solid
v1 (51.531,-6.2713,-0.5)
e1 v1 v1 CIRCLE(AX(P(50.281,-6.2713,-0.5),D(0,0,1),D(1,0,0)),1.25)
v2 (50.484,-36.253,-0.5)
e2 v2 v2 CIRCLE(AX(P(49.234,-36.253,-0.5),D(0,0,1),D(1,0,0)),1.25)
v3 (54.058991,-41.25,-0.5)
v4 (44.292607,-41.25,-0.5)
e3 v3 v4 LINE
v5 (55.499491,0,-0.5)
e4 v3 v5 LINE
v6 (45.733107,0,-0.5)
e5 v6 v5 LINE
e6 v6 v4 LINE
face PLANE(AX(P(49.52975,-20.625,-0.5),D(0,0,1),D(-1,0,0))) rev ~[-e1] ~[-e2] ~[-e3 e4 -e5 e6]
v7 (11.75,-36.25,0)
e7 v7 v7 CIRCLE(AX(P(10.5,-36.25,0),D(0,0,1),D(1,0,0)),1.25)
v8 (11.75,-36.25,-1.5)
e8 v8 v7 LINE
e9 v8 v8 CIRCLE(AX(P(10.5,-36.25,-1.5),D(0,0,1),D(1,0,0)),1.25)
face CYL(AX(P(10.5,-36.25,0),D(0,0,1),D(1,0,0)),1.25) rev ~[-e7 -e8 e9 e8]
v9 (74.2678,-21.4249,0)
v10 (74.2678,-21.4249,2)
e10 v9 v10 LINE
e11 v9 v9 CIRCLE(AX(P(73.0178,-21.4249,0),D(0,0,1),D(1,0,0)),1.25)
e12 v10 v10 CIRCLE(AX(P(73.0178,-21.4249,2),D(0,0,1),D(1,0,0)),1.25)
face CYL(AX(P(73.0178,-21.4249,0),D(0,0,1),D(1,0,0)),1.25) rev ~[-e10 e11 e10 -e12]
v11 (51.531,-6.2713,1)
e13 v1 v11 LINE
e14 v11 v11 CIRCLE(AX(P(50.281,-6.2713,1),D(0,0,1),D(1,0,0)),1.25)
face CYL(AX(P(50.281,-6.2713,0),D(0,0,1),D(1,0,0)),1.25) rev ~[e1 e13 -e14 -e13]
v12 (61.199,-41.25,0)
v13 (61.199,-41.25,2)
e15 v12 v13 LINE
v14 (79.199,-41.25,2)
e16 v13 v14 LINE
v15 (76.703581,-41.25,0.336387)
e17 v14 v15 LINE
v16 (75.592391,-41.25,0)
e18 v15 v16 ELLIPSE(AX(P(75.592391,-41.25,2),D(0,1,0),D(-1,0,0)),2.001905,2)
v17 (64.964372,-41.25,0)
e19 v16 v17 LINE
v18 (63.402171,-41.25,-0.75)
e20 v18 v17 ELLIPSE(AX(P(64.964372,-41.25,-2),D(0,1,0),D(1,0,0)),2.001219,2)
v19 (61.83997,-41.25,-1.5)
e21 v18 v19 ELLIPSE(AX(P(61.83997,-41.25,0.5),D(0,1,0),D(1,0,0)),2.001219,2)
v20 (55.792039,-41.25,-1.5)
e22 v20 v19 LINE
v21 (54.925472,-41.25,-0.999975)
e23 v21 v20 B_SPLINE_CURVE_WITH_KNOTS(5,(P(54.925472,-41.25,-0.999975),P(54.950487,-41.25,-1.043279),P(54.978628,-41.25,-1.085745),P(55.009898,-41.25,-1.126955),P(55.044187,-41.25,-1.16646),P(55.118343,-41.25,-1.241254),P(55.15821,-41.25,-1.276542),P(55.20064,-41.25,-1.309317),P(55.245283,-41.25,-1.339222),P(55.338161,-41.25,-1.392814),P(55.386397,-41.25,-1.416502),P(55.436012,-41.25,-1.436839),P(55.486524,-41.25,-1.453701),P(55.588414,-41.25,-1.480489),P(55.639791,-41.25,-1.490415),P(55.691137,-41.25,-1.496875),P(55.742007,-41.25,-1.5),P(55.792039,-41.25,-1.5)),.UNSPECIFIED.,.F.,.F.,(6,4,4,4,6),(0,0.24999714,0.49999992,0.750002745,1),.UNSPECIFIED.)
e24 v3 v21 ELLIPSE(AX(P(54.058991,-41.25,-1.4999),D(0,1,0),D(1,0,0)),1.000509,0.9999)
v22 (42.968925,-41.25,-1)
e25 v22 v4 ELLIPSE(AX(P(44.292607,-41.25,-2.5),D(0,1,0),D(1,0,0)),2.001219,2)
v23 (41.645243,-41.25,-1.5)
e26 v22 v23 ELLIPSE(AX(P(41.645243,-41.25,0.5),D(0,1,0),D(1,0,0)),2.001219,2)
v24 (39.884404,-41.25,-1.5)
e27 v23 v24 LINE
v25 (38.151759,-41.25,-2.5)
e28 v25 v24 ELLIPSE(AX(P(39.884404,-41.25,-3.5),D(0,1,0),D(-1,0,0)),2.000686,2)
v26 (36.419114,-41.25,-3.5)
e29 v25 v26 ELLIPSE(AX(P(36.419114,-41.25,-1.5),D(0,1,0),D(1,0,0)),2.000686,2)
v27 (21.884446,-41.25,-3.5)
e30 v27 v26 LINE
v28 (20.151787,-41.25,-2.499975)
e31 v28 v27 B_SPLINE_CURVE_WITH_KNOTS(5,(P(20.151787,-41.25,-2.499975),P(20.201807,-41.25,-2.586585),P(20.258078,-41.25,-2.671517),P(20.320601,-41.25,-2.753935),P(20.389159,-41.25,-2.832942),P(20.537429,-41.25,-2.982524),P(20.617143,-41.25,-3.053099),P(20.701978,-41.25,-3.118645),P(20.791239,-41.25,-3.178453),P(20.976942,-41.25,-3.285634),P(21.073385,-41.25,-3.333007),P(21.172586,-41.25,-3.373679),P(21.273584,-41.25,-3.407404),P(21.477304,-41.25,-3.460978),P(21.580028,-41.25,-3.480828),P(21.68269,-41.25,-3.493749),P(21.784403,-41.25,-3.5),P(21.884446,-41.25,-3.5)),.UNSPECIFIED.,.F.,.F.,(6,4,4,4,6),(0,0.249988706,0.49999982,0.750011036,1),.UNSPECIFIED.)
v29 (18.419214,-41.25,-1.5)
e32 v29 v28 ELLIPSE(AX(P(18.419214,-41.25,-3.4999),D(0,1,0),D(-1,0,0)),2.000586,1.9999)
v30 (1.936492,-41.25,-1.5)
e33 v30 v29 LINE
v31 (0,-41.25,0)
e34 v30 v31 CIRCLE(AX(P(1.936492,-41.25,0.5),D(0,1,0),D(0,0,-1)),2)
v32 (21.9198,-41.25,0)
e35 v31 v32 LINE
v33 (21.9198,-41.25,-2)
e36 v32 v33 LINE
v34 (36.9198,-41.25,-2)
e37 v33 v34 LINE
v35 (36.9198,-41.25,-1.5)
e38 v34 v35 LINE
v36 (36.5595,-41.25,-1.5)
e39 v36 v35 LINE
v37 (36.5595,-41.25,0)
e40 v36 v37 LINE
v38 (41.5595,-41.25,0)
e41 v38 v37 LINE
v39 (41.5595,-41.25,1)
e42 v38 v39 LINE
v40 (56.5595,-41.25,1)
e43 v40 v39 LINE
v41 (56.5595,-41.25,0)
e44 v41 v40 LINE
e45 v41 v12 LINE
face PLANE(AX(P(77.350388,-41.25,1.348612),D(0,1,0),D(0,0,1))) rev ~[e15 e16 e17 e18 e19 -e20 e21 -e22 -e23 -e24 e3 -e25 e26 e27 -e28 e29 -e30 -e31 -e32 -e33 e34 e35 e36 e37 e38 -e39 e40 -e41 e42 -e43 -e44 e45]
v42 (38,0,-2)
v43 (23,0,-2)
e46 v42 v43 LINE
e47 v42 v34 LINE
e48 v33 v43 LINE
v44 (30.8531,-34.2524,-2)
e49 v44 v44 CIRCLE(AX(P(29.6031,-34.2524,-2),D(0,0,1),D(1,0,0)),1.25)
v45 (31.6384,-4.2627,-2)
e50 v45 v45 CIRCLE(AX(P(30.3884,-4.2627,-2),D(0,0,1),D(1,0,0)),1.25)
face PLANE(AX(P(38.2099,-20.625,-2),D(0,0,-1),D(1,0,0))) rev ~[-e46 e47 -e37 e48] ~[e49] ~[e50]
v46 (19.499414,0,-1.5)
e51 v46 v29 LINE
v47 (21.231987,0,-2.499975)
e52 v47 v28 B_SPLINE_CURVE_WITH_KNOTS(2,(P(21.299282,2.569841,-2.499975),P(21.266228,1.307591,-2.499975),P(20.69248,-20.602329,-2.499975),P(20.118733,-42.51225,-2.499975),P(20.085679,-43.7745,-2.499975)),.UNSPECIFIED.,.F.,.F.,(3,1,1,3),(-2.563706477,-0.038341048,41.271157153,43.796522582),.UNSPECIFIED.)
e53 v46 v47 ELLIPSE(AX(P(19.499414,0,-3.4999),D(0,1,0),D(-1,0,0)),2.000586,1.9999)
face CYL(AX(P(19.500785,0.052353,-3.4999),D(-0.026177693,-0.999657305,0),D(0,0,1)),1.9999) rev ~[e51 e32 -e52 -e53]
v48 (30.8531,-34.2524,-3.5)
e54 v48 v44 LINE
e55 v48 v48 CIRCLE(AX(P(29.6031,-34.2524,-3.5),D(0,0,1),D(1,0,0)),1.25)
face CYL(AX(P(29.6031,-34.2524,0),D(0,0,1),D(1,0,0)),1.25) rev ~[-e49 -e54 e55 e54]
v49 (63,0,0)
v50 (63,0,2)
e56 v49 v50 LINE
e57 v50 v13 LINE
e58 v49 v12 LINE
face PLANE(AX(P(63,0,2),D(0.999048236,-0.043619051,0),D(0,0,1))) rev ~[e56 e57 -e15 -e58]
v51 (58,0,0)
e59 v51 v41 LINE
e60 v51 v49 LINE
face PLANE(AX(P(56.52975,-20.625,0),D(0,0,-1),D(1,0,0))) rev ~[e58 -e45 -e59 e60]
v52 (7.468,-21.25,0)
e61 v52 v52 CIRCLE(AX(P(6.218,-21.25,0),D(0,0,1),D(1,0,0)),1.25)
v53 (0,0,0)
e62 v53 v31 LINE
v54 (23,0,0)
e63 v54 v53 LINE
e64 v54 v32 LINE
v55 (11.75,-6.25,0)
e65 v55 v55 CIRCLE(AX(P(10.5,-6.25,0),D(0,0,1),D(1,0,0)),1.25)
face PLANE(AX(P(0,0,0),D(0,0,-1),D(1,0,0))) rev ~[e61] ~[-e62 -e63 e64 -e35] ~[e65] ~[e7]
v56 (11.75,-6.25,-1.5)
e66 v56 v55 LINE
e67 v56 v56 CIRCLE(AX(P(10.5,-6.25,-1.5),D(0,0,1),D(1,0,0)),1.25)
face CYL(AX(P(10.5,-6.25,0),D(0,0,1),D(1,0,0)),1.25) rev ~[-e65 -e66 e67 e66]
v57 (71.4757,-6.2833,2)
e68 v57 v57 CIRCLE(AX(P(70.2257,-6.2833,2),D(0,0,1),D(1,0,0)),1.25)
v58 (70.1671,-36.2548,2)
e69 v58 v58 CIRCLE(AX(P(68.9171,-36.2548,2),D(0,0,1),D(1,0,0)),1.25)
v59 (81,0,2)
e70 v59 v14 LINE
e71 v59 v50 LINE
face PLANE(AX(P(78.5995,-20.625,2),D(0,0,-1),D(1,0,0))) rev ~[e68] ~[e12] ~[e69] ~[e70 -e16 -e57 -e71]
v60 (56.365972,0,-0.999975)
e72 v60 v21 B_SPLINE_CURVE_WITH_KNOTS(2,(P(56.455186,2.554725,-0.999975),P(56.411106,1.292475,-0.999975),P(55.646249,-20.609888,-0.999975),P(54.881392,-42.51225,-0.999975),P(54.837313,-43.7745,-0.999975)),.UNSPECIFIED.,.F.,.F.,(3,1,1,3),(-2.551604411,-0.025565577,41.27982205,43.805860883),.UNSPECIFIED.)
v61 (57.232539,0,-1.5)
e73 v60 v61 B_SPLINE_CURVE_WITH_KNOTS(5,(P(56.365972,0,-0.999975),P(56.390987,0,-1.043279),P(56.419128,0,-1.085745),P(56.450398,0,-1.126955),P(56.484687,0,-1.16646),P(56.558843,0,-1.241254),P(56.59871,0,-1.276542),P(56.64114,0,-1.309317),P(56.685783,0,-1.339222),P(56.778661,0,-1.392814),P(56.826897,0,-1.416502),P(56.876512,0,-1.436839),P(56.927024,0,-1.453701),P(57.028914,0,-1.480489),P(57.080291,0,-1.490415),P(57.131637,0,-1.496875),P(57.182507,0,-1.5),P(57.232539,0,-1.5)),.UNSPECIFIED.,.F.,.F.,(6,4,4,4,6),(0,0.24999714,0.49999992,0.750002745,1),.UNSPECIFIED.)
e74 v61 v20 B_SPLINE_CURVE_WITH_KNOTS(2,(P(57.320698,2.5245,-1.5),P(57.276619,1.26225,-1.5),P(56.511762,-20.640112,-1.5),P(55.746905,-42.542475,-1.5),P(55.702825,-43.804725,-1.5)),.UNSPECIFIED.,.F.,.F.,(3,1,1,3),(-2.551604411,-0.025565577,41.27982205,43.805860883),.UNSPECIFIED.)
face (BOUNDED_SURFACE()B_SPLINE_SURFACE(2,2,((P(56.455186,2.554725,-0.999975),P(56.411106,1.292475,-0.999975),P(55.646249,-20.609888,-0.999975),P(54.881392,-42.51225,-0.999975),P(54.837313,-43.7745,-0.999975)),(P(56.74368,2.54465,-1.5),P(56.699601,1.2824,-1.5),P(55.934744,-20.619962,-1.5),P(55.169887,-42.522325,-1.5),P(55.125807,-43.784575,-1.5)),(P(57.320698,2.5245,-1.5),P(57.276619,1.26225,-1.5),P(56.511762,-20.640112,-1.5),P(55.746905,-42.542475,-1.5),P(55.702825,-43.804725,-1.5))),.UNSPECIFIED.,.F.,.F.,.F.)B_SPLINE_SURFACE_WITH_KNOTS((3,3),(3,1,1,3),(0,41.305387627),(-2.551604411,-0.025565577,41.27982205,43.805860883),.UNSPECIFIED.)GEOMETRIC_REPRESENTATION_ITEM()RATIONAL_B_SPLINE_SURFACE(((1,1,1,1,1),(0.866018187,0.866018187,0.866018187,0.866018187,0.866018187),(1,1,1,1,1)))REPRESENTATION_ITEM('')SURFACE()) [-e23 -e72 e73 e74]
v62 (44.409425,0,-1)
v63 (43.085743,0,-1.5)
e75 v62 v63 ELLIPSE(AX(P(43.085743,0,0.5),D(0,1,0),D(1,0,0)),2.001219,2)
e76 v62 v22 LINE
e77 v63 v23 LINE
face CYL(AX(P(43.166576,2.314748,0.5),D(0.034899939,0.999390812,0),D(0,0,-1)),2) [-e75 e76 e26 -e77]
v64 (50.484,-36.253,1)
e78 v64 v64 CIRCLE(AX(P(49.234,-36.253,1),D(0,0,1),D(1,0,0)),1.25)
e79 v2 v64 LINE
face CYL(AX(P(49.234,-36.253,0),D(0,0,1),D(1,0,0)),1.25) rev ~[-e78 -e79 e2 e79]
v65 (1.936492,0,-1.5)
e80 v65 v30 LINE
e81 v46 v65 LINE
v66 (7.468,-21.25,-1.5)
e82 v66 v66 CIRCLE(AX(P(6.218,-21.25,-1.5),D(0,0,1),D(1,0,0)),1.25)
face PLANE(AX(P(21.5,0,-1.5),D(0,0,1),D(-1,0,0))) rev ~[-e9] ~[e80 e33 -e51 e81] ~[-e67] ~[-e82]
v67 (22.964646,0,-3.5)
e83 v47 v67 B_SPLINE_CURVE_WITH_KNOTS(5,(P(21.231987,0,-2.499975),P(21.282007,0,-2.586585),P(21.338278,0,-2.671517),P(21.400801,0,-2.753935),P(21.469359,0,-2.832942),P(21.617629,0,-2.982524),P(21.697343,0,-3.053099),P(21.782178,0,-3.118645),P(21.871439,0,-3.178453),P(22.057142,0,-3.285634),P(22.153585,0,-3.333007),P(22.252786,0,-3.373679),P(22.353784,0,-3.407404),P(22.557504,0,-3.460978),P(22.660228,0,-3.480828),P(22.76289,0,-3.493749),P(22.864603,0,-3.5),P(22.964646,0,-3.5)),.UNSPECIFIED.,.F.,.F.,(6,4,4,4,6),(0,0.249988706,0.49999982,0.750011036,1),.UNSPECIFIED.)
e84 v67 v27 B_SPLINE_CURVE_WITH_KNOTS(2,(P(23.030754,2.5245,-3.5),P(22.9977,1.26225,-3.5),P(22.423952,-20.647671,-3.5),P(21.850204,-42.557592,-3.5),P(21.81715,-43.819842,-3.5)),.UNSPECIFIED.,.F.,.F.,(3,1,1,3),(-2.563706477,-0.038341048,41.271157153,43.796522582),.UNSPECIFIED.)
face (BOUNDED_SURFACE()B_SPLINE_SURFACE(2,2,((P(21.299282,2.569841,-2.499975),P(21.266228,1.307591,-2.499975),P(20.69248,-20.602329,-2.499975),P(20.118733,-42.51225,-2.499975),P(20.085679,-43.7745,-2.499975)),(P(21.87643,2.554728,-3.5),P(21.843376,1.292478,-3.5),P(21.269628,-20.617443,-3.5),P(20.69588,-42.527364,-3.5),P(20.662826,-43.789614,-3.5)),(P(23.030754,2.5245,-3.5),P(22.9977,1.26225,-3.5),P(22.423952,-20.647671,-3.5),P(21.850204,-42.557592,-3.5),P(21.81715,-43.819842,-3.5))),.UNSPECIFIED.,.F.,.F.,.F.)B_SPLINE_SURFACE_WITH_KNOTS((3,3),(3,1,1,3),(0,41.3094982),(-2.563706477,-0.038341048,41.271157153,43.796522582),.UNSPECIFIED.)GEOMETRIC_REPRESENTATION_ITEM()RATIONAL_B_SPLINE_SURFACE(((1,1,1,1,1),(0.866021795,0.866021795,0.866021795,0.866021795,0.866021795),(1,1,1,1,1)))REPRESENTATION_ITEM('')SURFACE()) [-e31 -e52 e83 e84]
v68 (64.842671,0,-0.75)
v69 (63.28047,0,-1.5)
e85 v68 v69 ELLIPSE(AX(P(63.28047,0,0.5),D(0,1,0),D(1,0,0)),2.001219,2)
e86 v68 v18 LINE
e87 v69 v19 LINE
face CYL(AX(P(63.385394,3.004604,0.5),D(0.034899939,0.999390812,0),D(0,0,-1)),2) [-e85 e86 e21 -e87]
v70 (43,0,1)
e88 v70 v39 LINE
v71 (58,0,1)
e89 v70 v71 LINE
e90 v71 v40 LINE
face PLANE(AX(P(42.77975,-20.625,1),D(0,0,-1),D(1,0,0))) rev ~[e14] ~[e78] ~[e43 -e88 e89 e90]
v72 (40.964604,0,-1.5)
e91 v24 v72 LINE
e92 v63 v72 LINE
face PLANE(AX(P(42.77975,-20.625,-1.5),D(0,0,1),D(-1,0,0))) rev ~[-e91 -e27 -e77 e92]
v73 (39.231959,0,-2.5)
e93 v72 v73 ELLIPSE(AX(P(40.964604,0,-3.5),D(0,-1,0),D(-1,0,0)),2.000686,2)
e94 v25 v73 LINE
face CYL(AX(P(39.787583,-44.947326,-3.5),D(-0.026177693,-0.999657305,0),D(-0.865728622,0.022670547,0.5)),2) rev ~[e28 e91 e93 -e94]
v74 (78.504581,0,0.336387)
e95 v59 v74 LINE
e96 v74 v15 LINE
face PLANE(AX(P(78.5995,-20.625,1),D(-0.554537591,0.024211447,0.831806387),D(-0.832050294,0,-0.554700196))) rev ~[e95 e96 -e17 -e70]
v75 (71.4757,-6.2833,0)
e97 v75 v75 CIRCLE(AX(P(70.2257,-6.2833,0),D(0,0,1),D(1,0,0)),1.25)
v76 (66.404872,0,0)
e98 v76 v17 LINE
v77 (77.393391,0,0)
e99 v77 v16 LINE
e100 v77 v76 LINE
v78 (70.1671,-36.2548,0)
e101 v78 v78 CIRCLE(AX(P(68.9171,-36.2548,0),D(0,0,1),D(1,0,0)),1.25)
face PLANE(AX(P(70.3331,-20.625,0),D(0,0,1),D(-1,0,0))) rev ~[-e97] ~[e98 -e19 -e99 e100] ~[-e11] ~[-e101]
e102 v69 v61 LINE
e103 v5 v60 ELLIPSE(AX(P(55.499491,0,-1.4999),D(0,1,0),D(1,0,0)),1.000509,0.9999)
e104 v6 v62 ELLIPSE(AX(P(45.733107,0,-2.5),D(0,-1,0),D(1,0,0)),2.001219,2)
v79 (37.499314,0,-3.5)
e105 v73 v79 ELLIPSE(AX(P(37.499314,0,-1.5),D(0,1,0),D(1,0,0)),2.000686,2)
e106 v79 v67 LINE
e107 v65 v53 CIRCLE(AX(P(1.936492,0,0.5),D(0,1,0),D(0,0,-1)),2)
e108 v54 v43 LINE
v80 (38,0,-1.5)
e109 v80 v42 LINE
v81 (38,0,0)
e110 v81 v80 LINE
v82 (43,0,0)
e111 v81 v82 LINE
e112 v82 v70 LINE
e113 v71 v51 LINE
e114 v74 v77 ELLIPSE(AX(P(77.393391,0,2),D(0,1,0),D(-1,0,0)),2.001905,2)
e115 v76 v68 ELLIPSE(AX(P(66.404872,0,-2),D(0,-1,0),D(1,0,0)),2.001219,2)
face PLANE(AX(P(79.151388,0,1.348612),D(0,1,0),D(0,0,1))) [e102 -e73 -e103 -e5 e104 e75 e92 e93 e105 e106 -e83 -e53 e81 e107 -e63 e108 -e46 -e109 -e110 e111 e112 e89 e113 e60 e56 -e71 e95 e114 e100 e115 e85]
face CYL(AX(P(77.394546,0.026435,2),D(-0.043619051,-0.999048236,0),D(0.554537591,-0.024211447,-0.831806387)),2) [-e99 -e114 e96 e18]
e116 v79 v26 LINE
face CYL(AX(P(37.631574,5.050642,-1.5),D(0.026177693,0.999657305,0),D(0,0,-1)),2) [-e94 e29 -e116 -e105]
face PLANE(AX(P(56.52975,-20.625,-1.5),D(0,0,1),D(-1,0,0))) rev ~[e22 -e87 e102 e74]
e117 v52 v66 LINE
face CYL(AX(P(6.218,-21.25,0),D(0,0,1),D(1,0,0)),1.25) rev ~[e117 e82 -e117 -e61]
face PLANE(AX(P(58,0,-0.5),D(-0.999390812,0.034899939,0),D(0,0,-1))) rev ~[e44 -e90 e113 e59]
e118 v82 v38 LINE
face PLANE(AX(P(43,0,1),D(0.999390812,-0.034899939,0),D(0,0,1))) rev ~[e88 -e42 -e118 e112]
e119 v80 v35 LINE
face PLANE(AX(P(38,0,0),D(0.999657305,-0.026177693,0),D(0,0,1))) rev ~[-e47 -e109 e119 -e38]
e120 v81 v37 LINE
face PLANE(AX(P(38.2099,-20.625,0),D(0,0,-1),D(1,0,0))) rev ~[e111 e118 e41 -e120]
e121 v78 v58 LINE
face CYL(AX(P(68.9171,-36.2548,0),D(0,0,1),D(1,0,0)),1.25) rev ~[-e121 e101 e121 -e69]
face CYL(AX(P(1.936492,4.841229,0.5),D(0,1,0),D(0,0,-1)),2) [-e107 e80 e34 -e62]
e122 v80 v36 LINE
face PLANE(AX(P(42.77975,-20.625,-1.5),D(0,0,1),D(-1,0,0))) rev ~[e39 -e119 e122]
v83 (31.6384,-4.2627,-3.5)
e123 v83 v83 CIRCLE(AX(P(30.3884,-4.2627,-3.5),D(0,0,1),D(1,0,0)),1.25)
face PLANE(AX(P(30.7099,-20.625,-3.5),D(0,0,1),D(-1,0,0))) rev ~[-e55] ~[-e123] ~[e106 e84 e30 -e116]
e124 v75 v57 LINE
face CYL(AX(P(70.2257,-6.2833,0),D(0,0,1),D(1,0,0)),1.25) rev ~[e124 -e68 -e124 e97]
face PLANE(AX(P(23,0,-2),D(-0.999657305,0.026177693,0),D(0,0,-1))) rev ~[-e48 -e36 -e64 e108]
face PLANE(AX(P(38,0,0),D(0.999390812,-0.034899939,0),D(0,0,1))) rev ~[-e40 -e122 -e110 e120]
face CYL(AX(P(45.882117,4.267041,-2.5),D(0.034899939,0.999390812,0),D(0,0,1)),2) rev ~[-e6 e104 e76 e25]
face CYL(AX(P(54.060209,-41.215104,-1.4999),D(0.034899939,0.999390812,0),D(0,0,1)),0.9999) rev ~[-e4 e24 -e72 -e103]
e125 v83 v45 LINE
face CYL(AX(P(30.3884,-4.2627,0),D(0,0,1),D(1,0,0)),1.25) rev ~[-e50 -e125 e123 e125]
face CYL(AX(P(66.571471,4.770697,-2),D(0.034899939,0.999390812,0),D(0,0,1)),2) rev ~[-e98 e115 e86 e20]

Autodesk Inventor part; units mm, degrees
ref_plane "YZ Plane" through (0, 0, 0) normal (1, 0, 0) x (0, 1, 0)
ref_plane "XY Plane" through (0, 0, 0) normal (0, 0, 1) x (1, 0, 0)
sketch "Sketch1" plane through (0, 0, 0) normal (0, 0, 1) x (1, 0, 0)
  line L0 (0, 0) -> (81, 0)
  line L1 (0, 0) -> (0, -41.25)
  line L2 (0, -41.25) -> (76.5595, -41.25)
  line L3 (10.5, 0) -> (10.5, -41.25)
  line L4 (30.5, 0) -> (29.4198, -41.25)
  line L5 (30.5, 0) -> (71.7641, 0) construction
  line L6 (50.5, 0) -> (49.0595, -41.25)
  line L7 (70.5, 0) -> (68.699, -41.25)
  line L8 (78, 0) -> (76.5595, -41.25)
  line L9 (78, 0) -> (119.2751, 0) construction
  line L10 (76.5595, -41.25) -> (81, 0)
  line L11 (3, 0) -> (3, -41.25)
  line L12 (18, 0) -> (18, -41.25)
  line L13 (23, 0) -> (21.9198, -41.25)
  line L14 (23, 0) -> (64.2641, 0) construction
  line L15 (38, 0) -> (36.9198, -41.25)
  line L16 (38, 0) -> (79.2641, 0) construction
  line L17 (43, 0) -> (41.5595, -41.25)
  line L18 (43, 0) -> (84.2751, 0) construction
  line L19 (58, 0) -> (56.5595, -41.25)
  line L20 (58, 0) -> (99.2751, 0) construction
  line L21 (63, 0) -> (61.199, -41.25)
  line L22 (63, 0) -> (104.2893, 0) construction
  line L23 (29.4198, -41.25) -> (29.6031, -34.2524)
  line L24 (29.6031, -34.2524) -> (30.3884, -4.2627)
  line L25 (49.0595, -41.25) -> (49.234, -36.253)
  line L26 (49.234, -36.253) -> (50.281, -6.2713)
  line L27 (68.699, -41.25) -> (68.9171, -36.2548)
  line L28 (68.9171, -36.2548) -> (70.2257, -6.2833)
  circle A0 centre (10.5, -6.25) radius 1.25
  circle A1 centre (10.5, -36.25) radius 1.25
  circle A2 centre (30.3884, -4.2627) radius 1.25
  circle A3 centre (29.6031, -34.2524) radius 1.25
  circle A4 centre (50.281, -6.2713) radius 1.25
  circle A5 centre (49.234, -36.253) radius 1.25
  circle A6 centre (70.2257, -6.2833) radius 1.25
  circle A7 centre (68.9171, -36.2548) radius 1.25
  line L29 (10.5, -6.25) -> (10.5, -21.25)
  line L30 (10.5, -21.25) -> (6.218, -21.25)
  circle A8 centre (6.218, -21.25) radius 1.25
  line L31 (6.218, -21.25) -> (73.0178, -21.4249)
  line L32 (6.218, -21.25) -> (73.018, -21.25) construction
  circle A9 centre (73.0178, -21.4249) radius 1.25
  dimension "d10" = 92
  dimension "d11" = 91.5
  dimension "d12" = 91.5
  dimension "d13" = 92
  dimension "d14" = 92
  dimension "d15" = 92.5
  dimension "d67" = 2.5
  dimension "d68" = 2.5
  dimension "d69" = 2.5
  dimension "d70" = 2.5
  dimension "d71" = 2.5
  dimension "d72" = 2.5
  dimension "d73" = 2.5
  dimension "d74" = 2.5
  dimension "d77" = 15
  dimension "d78" = 4.282
  dimension "d79" = 2.5
  dimension "d80" = 66.8
  dimension "d81" = 0.15
  dimension "d82" = 2.5
sketch "Sketch2" plane through (0, 0, 0) normal (0, 1, 0) x (-1, 0, 0)
  line L0 (-43, 0) -> (-58, 0)
  line L1 (-58, 0) -> (-58, 1)
  line L2 (-58, 1) -> (-43, 1)
  line L3 (-43, 1) -> (-43, 0)
  line L4 (-64.4672, 0) -> (-78, 0)
  line L5 (-78, 0) -> (-78, 2)
  line L6 (-78, 2) -> (-63, 2)
  line L7 (-63, 2) -> (-63, 0)
  line L8 (-23, 0) -> (-21.9198, 0) projected
  line L9 (-30.5, 0) -> (-29.4198, 0) projected
  line L10 (-23, 0) -> (-38, 0)
  line L11 (-38, 0) -> (-38, -2)
  line L12 (-38, -2) -> (-23, -2)
  line L13 (-23, -2) -> (-23, 0)
  line L14 (0, 0) -> (-23, 0)
  line L15 (-23, 0) -> (-23, -1.5)
  line L16 (-21.5, -1.5) -> (0, -1.5)
  line L17 (0, -1.5) -> (0, 0)
  line L18 (-23, 0) -> (-21.5, 0)
  line L19 (-21.5, -1.5) -> (-21.5, -3.5)
  line L20 (-21.5, -3.5) -> (-23, -3.5)
  line L21 (-23, -2) -> (-23, 0)
  line L22 (-23, -2) -> (-38, -2)
  line L23 (-39.5, -2) -> (-39.5, -3.5)
  line L24 (-39.5, -3.5) -> (-23, -3.5)
  line L25 (-39.5, -2) -> (-39.5, -1.5)
  line L26 (-39.5, 0) -> (-38, 0)
  line L27 (-38, 0) -> (-38, -2)
  line L28 (-38, 0) -> (-43, 0)
  line L29 (-43, -0.5) -> (-43, -1.5)
  line L30 (-43, -1.5) -> (-39.5, -1.5)
  line L31 (-38, -1.5) -> (-38, 0)
  line L32 (-43, 1) -> (-58, 1)
  line L33 (-58, 1) -> (-58, 0)
  line L34 (-56.5, -0.5) -> (-44, -0.5)
  line L35 (-43, -0.5) -> (-43, 1)
  line L36 (-38, 0) -> (-44, 0)
  line L37 (-44, -0.5) -> (-44, -1.5)
  line L38 (-44, -1.5) -> (-38, -1.5)
  line L39 (-38, -1.5) -> (-38, 0)
  line L40 (-56.5, 0) -> (-63, 0)
  line L41 (-64.4672, 0) -> (-64.4672, -1.5)
  line L42 (-64.4672, -1.5) -> (-56.5, -1.5)
  line L43 (-56.5, -1.5) -> (-56.5, -0.5)
  line L44 (-81, 2) -> (-78, 2)
  line L45 (-81, 2) -> (-78, 0)
  line L46 (-18, 0) -> (-18, -1.5)
  line L47 (0, 0) -> (-18, 0)
  line L48 (-18, 0) -> (-18, -1.5)
  line L49 (-18, -1.5) -> (0, -1.5)
  line L50 (0, -1.5) -> (0, 0)
  line L51 (-18, -1.5) -> (-18, 0)
  line L52 (-23, 0) -> (-23, -2)
  line L53 (-38, -2) -> (-38, 0)
  line L54 (-43, 0) -> (-43, -1.5)
  line L55 (-18, -1.5) -> (-21.5, -1.5)
  line L56 (-38, -2) -> (-23, -2)
  line L57 (-23, -2) -> (-23, 0)
  line L58 (-23, 0) -> (-18, 0)
  line L59 (-18, 0) -> (-18, -1.5)
  line L60 (-18, 0) -> (-23, 0)
  line L61 (-23, 0) -> (-23, -1.5)
  line L62 (-23, -1.5) -> (-18, -1.5)
  line L63 (-18, -1.5) -> (-18, 0)
  line L64 (-23, 0) -> (-21.5, 0)
  line L65 (-21.5, 0) -> (-21.5, -3.5)
  line L66 (-21.5, -3.5) -> (-23, -3.5)
  line L67 (-23, -3.5) -> (-23, 0)
  line L68 (-21.5, -3.5) -> (-39.5, -3.5)
  line L69 (-39.5, -3.5) -> (-39.5, -2)
  line L70 (-39.5, -2) -> (-21.5, -2)
  line L71 (-21.5, -2) -> (-21.5, -3.5)
  line L72 (-39.5, -2) -> (-38, -2)
  line L73 (-38, -2) -> (-38, 0)
  line L74 (-38, 0) -> (-39.5, 0)
  line L75 (-39.5, 0) -> (-39.5, -2)
  line L76 (-38, 0) -> (-44, 0)
  line L77 (-44, 0) -> (-44, -1.5)
  line L78 (-44, -1.5) -> (-38, -1.5)
  line L79 (-38, -1.5) -> (-38, 0)
  line L80 (-44, -0.5) -> (-58, -0.5)
  line L81 (-58, -0.5) -> (-58, 1)
  line L82 (-58, 1) -> (-44, 1)
  line L83 (-44, 1) -> (-44, -0.5)
  line L84 (-58, 1) -> (-56.5, 1)
  line L85 (-56.5, 1) -> (-56.5, -1.5)
  line L86 (-56.5, -1.5) -> (-58, -1.5)
  line L87 (-58, -1.5) -> (-58, 1)
  line L88 (-56.5, -1.5) -> (-64.4672, -1.5)
  line L89 (-64.4672, -1.5) -> (-64.4672, 0)
  line L90 (-64.4672, 0) -> (-56.5, 0)
  line L91 (-56.5, 0) -> (-56.5, -1.5)
  line L92 (-63, 0) -> (-78, 0)
  line L93 (-78, 0) -> (-78, 2)
  line L94 (-78, 2) -> (-63, 2)
  line L95 (-63, 2) -> (-63, 0)
  point P0 (-50.5, 0)
  point P1 (-58, 0)
  point P2 (-70.5, 0)
  point P3 (-81, 0)
  dimension "d24" = 1.5
  dimension "d29" = 6
ref_plane "Work Plane1" through (0, -41.25, 0) normal (0, 1, 0) x (-1, 0, 0)
sketch "Sketch3" plane through (0, -41.25, 0) normal (0, 1, 0) x (-1, 0, 0)
  line L0 (-23, 0) -> (-21.9198, 0) projected
  line L1 (-30.5, 0) -> (-29.4198, 0) projected
  line L2 (-38, 0) -> (-36.9198, 0) projected
  line L3 (-43, 0) -> (-41.5595, 0) projected
  line L4 (-50.5, 0) -> (-49.0595, 0) projected
  line L5 (-58, 0) -> (-56.5595, 0) projected
  line L6 (-63, 0) -> (-61.199, 0) projected
  line L7 (-70.5, 0) -> (-68.699, 0) projected
  line L8 (-78, 0) -> (-76.5595, 0) projected
  point P0 (0, 0)
  point P1 (-3, 0)
  point P2 (-3, 0)
  point P3 (-3, 0)
  point P4 (-10.5, 0)
  point P5 (-10.5, 0)
  point P6 (-10.5, 0)
  point P7 (-18, 0)
  point P8 (-18, 0)
  point P9 (-18, 0)
sketch "Sketch4" plane through (0, -41.25, 0) normal (0, 1, 0) x (-1, 0, 0)
  line L0 (0, 0) -> (-76.5595, 0) projected
  line L1 (-23, 0) -> (-21.9198, 0) projected
  line L2 (-30.5, 0) -> (-29.4198, 0) projected
  line L3 (-38, 0) -> (-36.9198, 0) projected
  line L4 (-43, 0) -> (-41.5595, 0) projected
  line L5 (-50.5, 0) -> (-49.0595, 0) projected
  line L6 (-58, 0) -> (-56.5595, 0) projected
  line L7 (-63, 0) -> (-61.199, 0) projected
  line L8 (-70.5, 0) -> (-68.699, 0) projected
  line L9 (-78, 0) -> (-76.5595, 0) projected
  line L10 (-21.9198, 0) -> (-36.9198, 0)
  line L11 (-36.9198, 0) -> (-36.9198, -2)
  line L12 (-36.9198, -2) -> (-21.9198, -2)
  line L13 (-21.9198, -2) -> (-21.9198, 0)
  line L14 (-41.5595, 0) -> (-56.5595, 0)
  line L15 (-56.5595, 0) -> (-56.5595, 1)
  line L16 (-56.5595, 1) -> (-41.5595, 1)
  line L17 (-41.5595, 1) -> (-41.5595, 0)
  line L18 (-61.199, 0) -> (-76.199, 0)
  line L19 (-76.199, 0) -> (-76.199, 2)
  line L20 (-76.199, 2) -> (-61.199, 2)
  line L21 (-61.199, 2) -> (-61.199, 0)
  point P0 (-3, 0)
  point P1 (-3, 0)
  point P2 (-3, 0)
  point P3 (-10.5, 0)
  point P4 (-10.5, 0)
  point P5 (-10.5, 0)
  point P6 (-18, 0)
  point P7 (-18, 0)
  point P8 (-18, 0)
  point P9 (-3, 0)
  point P10 (-10.5, 0)
  point P11 (-18, 0)
  dimension "d17" = 15
  dimension "d18" = 2
  dimension "d19" = 1
  dimension "d20" = 15
  dimension "d21" = 2
sketch "Sketch5" plane through (0, 0, 0) normal (0, 1, 0) x (-1, 0, 0)
  point P0 (0, 0)
sweep "Sweep1" add profiles "Sketch2" path "Sketch1" path curves L3 contours L14 L17 L16 L46
sweep "Sweep2" add profiles "Sketch2" path "Sketch1" path curves L13 contours L8 L14 L65 L62 L13 | L14 L46 L16 L65
sweep "Sweep3" add profiles "Sketch2" path "Sketch1" path curves L4 contours L70 L12 L67 L24 L23 | L70 L19 L20 L67
sweep "Sweep4" add profiles "Sketch2" path "Sketch1" path curves L4 contours L70 L19 L20 L67 | L13 L62 L19 L70
sketch3d "3D Sketch1"
  line L0 (39.5, 0, -2) -> (38.4198, -41.25, -2)
sweep "Sweep5" add profiles "Sketch2" path "3D Sketch1" contours L26 L11 L38 L75 | L38 L11 L70 L25
sweep "Sweep6" add profiles "Sketch2" path "Sketch1" path curves L17 contours L35 L29 L38 L37 L77 L0 | L28 L75 L30 L29 L35 | L26 L11 L38 L75
sweep "Sweep7" add profiles "Sketch2" path "Sketch1" path curves L6 contours L0 L83 L2 L3 | L0 L85 L2 L83 | L0 L1 L2 L85
sweep "Sweep8" add profiles "Sketch2" path "Sketch1" path curves L6 contours L77 L34 L85 L0 | L0 L85 L2 L83 | L85 L80 L81 L0 | L0 L1 L2 L85
sweep "Sweep9" add profiles "Sketch2" path "Sketch1" path curves L19 contours L85 L80 L81 L0 | L0 L1 L2 L85 | L43 L42 L87 L80
sketch3d "3D Sketch2"
  line L0 (58, 0, 1) -> (56.5595, -41.25, 1)
sweep "Sweep10" add profiles "Sketch2" path "3D Sketch2" contours L85 L80 L81 L0 | L81 L87 L42 L41 L90 L40 | L43 L42 L87 L80
sweep "Sweep11" add profiles "Sketch2" path "Sketch1" path curves L21 contours L90 L4 L5 L6 L7
sketch3d "3D Sketch3"
  line L0 (78, 0, 2) -> (76.199, -41.25, 2)
sweep "Sweep12" add profiles "Sketch2" path "3D Sketch3" contours L5 L45 L44
fillet "Fillet1" radius 2 1 edges at (77.0995, -20.625, 0)
fillet "Fillet2" radius 2 2 edges at (63.7469, -20.625, -1.5) (63.7469, -20.625, 0)
fillet "Fillet3" radius 1 2 edges at (55.7798, -20.625, -1.5) (55.7798, -20.625, -0.5)
fillet "Fillet4" radius 2 2 edges at (43.2798, -20.625, -0.5) (43.2798, -20.625, -1.5)
fillet "Fillet5" radius 2 2 edges at (38.9599, -20.625, -1.5) (38.9599, -20.625, -3.5)
fillet "Fillet6" radius 2 2 edges at (20.9599, -20.625, -3.5) (20.9599, -20.625, -1.5)
fillet "Fillet7" radius 2 1 edges at (0, -20.625, -1.5)
extrude "Extrusion1" cut sketch "Sketch1" along normal through all both and the other way through all contours A0 L3 | L3 A0 | A1 L3 | L3 A1 | A2 L4 | L4 A2 | A3 L4 | L4 A3 | A4 L6 | L6 A4 | A5 L6 | L6 A5 | A6 L7 | L7 A6 | A7 L7 | L7 A7
extrude "Extrusion2" cut sketch "Sketch1" along normal through all both and the other way through all contours L31 L30 A8 | A8 L30 L31 | A9
properties part number "Finger_Screwing_Cage_1"
